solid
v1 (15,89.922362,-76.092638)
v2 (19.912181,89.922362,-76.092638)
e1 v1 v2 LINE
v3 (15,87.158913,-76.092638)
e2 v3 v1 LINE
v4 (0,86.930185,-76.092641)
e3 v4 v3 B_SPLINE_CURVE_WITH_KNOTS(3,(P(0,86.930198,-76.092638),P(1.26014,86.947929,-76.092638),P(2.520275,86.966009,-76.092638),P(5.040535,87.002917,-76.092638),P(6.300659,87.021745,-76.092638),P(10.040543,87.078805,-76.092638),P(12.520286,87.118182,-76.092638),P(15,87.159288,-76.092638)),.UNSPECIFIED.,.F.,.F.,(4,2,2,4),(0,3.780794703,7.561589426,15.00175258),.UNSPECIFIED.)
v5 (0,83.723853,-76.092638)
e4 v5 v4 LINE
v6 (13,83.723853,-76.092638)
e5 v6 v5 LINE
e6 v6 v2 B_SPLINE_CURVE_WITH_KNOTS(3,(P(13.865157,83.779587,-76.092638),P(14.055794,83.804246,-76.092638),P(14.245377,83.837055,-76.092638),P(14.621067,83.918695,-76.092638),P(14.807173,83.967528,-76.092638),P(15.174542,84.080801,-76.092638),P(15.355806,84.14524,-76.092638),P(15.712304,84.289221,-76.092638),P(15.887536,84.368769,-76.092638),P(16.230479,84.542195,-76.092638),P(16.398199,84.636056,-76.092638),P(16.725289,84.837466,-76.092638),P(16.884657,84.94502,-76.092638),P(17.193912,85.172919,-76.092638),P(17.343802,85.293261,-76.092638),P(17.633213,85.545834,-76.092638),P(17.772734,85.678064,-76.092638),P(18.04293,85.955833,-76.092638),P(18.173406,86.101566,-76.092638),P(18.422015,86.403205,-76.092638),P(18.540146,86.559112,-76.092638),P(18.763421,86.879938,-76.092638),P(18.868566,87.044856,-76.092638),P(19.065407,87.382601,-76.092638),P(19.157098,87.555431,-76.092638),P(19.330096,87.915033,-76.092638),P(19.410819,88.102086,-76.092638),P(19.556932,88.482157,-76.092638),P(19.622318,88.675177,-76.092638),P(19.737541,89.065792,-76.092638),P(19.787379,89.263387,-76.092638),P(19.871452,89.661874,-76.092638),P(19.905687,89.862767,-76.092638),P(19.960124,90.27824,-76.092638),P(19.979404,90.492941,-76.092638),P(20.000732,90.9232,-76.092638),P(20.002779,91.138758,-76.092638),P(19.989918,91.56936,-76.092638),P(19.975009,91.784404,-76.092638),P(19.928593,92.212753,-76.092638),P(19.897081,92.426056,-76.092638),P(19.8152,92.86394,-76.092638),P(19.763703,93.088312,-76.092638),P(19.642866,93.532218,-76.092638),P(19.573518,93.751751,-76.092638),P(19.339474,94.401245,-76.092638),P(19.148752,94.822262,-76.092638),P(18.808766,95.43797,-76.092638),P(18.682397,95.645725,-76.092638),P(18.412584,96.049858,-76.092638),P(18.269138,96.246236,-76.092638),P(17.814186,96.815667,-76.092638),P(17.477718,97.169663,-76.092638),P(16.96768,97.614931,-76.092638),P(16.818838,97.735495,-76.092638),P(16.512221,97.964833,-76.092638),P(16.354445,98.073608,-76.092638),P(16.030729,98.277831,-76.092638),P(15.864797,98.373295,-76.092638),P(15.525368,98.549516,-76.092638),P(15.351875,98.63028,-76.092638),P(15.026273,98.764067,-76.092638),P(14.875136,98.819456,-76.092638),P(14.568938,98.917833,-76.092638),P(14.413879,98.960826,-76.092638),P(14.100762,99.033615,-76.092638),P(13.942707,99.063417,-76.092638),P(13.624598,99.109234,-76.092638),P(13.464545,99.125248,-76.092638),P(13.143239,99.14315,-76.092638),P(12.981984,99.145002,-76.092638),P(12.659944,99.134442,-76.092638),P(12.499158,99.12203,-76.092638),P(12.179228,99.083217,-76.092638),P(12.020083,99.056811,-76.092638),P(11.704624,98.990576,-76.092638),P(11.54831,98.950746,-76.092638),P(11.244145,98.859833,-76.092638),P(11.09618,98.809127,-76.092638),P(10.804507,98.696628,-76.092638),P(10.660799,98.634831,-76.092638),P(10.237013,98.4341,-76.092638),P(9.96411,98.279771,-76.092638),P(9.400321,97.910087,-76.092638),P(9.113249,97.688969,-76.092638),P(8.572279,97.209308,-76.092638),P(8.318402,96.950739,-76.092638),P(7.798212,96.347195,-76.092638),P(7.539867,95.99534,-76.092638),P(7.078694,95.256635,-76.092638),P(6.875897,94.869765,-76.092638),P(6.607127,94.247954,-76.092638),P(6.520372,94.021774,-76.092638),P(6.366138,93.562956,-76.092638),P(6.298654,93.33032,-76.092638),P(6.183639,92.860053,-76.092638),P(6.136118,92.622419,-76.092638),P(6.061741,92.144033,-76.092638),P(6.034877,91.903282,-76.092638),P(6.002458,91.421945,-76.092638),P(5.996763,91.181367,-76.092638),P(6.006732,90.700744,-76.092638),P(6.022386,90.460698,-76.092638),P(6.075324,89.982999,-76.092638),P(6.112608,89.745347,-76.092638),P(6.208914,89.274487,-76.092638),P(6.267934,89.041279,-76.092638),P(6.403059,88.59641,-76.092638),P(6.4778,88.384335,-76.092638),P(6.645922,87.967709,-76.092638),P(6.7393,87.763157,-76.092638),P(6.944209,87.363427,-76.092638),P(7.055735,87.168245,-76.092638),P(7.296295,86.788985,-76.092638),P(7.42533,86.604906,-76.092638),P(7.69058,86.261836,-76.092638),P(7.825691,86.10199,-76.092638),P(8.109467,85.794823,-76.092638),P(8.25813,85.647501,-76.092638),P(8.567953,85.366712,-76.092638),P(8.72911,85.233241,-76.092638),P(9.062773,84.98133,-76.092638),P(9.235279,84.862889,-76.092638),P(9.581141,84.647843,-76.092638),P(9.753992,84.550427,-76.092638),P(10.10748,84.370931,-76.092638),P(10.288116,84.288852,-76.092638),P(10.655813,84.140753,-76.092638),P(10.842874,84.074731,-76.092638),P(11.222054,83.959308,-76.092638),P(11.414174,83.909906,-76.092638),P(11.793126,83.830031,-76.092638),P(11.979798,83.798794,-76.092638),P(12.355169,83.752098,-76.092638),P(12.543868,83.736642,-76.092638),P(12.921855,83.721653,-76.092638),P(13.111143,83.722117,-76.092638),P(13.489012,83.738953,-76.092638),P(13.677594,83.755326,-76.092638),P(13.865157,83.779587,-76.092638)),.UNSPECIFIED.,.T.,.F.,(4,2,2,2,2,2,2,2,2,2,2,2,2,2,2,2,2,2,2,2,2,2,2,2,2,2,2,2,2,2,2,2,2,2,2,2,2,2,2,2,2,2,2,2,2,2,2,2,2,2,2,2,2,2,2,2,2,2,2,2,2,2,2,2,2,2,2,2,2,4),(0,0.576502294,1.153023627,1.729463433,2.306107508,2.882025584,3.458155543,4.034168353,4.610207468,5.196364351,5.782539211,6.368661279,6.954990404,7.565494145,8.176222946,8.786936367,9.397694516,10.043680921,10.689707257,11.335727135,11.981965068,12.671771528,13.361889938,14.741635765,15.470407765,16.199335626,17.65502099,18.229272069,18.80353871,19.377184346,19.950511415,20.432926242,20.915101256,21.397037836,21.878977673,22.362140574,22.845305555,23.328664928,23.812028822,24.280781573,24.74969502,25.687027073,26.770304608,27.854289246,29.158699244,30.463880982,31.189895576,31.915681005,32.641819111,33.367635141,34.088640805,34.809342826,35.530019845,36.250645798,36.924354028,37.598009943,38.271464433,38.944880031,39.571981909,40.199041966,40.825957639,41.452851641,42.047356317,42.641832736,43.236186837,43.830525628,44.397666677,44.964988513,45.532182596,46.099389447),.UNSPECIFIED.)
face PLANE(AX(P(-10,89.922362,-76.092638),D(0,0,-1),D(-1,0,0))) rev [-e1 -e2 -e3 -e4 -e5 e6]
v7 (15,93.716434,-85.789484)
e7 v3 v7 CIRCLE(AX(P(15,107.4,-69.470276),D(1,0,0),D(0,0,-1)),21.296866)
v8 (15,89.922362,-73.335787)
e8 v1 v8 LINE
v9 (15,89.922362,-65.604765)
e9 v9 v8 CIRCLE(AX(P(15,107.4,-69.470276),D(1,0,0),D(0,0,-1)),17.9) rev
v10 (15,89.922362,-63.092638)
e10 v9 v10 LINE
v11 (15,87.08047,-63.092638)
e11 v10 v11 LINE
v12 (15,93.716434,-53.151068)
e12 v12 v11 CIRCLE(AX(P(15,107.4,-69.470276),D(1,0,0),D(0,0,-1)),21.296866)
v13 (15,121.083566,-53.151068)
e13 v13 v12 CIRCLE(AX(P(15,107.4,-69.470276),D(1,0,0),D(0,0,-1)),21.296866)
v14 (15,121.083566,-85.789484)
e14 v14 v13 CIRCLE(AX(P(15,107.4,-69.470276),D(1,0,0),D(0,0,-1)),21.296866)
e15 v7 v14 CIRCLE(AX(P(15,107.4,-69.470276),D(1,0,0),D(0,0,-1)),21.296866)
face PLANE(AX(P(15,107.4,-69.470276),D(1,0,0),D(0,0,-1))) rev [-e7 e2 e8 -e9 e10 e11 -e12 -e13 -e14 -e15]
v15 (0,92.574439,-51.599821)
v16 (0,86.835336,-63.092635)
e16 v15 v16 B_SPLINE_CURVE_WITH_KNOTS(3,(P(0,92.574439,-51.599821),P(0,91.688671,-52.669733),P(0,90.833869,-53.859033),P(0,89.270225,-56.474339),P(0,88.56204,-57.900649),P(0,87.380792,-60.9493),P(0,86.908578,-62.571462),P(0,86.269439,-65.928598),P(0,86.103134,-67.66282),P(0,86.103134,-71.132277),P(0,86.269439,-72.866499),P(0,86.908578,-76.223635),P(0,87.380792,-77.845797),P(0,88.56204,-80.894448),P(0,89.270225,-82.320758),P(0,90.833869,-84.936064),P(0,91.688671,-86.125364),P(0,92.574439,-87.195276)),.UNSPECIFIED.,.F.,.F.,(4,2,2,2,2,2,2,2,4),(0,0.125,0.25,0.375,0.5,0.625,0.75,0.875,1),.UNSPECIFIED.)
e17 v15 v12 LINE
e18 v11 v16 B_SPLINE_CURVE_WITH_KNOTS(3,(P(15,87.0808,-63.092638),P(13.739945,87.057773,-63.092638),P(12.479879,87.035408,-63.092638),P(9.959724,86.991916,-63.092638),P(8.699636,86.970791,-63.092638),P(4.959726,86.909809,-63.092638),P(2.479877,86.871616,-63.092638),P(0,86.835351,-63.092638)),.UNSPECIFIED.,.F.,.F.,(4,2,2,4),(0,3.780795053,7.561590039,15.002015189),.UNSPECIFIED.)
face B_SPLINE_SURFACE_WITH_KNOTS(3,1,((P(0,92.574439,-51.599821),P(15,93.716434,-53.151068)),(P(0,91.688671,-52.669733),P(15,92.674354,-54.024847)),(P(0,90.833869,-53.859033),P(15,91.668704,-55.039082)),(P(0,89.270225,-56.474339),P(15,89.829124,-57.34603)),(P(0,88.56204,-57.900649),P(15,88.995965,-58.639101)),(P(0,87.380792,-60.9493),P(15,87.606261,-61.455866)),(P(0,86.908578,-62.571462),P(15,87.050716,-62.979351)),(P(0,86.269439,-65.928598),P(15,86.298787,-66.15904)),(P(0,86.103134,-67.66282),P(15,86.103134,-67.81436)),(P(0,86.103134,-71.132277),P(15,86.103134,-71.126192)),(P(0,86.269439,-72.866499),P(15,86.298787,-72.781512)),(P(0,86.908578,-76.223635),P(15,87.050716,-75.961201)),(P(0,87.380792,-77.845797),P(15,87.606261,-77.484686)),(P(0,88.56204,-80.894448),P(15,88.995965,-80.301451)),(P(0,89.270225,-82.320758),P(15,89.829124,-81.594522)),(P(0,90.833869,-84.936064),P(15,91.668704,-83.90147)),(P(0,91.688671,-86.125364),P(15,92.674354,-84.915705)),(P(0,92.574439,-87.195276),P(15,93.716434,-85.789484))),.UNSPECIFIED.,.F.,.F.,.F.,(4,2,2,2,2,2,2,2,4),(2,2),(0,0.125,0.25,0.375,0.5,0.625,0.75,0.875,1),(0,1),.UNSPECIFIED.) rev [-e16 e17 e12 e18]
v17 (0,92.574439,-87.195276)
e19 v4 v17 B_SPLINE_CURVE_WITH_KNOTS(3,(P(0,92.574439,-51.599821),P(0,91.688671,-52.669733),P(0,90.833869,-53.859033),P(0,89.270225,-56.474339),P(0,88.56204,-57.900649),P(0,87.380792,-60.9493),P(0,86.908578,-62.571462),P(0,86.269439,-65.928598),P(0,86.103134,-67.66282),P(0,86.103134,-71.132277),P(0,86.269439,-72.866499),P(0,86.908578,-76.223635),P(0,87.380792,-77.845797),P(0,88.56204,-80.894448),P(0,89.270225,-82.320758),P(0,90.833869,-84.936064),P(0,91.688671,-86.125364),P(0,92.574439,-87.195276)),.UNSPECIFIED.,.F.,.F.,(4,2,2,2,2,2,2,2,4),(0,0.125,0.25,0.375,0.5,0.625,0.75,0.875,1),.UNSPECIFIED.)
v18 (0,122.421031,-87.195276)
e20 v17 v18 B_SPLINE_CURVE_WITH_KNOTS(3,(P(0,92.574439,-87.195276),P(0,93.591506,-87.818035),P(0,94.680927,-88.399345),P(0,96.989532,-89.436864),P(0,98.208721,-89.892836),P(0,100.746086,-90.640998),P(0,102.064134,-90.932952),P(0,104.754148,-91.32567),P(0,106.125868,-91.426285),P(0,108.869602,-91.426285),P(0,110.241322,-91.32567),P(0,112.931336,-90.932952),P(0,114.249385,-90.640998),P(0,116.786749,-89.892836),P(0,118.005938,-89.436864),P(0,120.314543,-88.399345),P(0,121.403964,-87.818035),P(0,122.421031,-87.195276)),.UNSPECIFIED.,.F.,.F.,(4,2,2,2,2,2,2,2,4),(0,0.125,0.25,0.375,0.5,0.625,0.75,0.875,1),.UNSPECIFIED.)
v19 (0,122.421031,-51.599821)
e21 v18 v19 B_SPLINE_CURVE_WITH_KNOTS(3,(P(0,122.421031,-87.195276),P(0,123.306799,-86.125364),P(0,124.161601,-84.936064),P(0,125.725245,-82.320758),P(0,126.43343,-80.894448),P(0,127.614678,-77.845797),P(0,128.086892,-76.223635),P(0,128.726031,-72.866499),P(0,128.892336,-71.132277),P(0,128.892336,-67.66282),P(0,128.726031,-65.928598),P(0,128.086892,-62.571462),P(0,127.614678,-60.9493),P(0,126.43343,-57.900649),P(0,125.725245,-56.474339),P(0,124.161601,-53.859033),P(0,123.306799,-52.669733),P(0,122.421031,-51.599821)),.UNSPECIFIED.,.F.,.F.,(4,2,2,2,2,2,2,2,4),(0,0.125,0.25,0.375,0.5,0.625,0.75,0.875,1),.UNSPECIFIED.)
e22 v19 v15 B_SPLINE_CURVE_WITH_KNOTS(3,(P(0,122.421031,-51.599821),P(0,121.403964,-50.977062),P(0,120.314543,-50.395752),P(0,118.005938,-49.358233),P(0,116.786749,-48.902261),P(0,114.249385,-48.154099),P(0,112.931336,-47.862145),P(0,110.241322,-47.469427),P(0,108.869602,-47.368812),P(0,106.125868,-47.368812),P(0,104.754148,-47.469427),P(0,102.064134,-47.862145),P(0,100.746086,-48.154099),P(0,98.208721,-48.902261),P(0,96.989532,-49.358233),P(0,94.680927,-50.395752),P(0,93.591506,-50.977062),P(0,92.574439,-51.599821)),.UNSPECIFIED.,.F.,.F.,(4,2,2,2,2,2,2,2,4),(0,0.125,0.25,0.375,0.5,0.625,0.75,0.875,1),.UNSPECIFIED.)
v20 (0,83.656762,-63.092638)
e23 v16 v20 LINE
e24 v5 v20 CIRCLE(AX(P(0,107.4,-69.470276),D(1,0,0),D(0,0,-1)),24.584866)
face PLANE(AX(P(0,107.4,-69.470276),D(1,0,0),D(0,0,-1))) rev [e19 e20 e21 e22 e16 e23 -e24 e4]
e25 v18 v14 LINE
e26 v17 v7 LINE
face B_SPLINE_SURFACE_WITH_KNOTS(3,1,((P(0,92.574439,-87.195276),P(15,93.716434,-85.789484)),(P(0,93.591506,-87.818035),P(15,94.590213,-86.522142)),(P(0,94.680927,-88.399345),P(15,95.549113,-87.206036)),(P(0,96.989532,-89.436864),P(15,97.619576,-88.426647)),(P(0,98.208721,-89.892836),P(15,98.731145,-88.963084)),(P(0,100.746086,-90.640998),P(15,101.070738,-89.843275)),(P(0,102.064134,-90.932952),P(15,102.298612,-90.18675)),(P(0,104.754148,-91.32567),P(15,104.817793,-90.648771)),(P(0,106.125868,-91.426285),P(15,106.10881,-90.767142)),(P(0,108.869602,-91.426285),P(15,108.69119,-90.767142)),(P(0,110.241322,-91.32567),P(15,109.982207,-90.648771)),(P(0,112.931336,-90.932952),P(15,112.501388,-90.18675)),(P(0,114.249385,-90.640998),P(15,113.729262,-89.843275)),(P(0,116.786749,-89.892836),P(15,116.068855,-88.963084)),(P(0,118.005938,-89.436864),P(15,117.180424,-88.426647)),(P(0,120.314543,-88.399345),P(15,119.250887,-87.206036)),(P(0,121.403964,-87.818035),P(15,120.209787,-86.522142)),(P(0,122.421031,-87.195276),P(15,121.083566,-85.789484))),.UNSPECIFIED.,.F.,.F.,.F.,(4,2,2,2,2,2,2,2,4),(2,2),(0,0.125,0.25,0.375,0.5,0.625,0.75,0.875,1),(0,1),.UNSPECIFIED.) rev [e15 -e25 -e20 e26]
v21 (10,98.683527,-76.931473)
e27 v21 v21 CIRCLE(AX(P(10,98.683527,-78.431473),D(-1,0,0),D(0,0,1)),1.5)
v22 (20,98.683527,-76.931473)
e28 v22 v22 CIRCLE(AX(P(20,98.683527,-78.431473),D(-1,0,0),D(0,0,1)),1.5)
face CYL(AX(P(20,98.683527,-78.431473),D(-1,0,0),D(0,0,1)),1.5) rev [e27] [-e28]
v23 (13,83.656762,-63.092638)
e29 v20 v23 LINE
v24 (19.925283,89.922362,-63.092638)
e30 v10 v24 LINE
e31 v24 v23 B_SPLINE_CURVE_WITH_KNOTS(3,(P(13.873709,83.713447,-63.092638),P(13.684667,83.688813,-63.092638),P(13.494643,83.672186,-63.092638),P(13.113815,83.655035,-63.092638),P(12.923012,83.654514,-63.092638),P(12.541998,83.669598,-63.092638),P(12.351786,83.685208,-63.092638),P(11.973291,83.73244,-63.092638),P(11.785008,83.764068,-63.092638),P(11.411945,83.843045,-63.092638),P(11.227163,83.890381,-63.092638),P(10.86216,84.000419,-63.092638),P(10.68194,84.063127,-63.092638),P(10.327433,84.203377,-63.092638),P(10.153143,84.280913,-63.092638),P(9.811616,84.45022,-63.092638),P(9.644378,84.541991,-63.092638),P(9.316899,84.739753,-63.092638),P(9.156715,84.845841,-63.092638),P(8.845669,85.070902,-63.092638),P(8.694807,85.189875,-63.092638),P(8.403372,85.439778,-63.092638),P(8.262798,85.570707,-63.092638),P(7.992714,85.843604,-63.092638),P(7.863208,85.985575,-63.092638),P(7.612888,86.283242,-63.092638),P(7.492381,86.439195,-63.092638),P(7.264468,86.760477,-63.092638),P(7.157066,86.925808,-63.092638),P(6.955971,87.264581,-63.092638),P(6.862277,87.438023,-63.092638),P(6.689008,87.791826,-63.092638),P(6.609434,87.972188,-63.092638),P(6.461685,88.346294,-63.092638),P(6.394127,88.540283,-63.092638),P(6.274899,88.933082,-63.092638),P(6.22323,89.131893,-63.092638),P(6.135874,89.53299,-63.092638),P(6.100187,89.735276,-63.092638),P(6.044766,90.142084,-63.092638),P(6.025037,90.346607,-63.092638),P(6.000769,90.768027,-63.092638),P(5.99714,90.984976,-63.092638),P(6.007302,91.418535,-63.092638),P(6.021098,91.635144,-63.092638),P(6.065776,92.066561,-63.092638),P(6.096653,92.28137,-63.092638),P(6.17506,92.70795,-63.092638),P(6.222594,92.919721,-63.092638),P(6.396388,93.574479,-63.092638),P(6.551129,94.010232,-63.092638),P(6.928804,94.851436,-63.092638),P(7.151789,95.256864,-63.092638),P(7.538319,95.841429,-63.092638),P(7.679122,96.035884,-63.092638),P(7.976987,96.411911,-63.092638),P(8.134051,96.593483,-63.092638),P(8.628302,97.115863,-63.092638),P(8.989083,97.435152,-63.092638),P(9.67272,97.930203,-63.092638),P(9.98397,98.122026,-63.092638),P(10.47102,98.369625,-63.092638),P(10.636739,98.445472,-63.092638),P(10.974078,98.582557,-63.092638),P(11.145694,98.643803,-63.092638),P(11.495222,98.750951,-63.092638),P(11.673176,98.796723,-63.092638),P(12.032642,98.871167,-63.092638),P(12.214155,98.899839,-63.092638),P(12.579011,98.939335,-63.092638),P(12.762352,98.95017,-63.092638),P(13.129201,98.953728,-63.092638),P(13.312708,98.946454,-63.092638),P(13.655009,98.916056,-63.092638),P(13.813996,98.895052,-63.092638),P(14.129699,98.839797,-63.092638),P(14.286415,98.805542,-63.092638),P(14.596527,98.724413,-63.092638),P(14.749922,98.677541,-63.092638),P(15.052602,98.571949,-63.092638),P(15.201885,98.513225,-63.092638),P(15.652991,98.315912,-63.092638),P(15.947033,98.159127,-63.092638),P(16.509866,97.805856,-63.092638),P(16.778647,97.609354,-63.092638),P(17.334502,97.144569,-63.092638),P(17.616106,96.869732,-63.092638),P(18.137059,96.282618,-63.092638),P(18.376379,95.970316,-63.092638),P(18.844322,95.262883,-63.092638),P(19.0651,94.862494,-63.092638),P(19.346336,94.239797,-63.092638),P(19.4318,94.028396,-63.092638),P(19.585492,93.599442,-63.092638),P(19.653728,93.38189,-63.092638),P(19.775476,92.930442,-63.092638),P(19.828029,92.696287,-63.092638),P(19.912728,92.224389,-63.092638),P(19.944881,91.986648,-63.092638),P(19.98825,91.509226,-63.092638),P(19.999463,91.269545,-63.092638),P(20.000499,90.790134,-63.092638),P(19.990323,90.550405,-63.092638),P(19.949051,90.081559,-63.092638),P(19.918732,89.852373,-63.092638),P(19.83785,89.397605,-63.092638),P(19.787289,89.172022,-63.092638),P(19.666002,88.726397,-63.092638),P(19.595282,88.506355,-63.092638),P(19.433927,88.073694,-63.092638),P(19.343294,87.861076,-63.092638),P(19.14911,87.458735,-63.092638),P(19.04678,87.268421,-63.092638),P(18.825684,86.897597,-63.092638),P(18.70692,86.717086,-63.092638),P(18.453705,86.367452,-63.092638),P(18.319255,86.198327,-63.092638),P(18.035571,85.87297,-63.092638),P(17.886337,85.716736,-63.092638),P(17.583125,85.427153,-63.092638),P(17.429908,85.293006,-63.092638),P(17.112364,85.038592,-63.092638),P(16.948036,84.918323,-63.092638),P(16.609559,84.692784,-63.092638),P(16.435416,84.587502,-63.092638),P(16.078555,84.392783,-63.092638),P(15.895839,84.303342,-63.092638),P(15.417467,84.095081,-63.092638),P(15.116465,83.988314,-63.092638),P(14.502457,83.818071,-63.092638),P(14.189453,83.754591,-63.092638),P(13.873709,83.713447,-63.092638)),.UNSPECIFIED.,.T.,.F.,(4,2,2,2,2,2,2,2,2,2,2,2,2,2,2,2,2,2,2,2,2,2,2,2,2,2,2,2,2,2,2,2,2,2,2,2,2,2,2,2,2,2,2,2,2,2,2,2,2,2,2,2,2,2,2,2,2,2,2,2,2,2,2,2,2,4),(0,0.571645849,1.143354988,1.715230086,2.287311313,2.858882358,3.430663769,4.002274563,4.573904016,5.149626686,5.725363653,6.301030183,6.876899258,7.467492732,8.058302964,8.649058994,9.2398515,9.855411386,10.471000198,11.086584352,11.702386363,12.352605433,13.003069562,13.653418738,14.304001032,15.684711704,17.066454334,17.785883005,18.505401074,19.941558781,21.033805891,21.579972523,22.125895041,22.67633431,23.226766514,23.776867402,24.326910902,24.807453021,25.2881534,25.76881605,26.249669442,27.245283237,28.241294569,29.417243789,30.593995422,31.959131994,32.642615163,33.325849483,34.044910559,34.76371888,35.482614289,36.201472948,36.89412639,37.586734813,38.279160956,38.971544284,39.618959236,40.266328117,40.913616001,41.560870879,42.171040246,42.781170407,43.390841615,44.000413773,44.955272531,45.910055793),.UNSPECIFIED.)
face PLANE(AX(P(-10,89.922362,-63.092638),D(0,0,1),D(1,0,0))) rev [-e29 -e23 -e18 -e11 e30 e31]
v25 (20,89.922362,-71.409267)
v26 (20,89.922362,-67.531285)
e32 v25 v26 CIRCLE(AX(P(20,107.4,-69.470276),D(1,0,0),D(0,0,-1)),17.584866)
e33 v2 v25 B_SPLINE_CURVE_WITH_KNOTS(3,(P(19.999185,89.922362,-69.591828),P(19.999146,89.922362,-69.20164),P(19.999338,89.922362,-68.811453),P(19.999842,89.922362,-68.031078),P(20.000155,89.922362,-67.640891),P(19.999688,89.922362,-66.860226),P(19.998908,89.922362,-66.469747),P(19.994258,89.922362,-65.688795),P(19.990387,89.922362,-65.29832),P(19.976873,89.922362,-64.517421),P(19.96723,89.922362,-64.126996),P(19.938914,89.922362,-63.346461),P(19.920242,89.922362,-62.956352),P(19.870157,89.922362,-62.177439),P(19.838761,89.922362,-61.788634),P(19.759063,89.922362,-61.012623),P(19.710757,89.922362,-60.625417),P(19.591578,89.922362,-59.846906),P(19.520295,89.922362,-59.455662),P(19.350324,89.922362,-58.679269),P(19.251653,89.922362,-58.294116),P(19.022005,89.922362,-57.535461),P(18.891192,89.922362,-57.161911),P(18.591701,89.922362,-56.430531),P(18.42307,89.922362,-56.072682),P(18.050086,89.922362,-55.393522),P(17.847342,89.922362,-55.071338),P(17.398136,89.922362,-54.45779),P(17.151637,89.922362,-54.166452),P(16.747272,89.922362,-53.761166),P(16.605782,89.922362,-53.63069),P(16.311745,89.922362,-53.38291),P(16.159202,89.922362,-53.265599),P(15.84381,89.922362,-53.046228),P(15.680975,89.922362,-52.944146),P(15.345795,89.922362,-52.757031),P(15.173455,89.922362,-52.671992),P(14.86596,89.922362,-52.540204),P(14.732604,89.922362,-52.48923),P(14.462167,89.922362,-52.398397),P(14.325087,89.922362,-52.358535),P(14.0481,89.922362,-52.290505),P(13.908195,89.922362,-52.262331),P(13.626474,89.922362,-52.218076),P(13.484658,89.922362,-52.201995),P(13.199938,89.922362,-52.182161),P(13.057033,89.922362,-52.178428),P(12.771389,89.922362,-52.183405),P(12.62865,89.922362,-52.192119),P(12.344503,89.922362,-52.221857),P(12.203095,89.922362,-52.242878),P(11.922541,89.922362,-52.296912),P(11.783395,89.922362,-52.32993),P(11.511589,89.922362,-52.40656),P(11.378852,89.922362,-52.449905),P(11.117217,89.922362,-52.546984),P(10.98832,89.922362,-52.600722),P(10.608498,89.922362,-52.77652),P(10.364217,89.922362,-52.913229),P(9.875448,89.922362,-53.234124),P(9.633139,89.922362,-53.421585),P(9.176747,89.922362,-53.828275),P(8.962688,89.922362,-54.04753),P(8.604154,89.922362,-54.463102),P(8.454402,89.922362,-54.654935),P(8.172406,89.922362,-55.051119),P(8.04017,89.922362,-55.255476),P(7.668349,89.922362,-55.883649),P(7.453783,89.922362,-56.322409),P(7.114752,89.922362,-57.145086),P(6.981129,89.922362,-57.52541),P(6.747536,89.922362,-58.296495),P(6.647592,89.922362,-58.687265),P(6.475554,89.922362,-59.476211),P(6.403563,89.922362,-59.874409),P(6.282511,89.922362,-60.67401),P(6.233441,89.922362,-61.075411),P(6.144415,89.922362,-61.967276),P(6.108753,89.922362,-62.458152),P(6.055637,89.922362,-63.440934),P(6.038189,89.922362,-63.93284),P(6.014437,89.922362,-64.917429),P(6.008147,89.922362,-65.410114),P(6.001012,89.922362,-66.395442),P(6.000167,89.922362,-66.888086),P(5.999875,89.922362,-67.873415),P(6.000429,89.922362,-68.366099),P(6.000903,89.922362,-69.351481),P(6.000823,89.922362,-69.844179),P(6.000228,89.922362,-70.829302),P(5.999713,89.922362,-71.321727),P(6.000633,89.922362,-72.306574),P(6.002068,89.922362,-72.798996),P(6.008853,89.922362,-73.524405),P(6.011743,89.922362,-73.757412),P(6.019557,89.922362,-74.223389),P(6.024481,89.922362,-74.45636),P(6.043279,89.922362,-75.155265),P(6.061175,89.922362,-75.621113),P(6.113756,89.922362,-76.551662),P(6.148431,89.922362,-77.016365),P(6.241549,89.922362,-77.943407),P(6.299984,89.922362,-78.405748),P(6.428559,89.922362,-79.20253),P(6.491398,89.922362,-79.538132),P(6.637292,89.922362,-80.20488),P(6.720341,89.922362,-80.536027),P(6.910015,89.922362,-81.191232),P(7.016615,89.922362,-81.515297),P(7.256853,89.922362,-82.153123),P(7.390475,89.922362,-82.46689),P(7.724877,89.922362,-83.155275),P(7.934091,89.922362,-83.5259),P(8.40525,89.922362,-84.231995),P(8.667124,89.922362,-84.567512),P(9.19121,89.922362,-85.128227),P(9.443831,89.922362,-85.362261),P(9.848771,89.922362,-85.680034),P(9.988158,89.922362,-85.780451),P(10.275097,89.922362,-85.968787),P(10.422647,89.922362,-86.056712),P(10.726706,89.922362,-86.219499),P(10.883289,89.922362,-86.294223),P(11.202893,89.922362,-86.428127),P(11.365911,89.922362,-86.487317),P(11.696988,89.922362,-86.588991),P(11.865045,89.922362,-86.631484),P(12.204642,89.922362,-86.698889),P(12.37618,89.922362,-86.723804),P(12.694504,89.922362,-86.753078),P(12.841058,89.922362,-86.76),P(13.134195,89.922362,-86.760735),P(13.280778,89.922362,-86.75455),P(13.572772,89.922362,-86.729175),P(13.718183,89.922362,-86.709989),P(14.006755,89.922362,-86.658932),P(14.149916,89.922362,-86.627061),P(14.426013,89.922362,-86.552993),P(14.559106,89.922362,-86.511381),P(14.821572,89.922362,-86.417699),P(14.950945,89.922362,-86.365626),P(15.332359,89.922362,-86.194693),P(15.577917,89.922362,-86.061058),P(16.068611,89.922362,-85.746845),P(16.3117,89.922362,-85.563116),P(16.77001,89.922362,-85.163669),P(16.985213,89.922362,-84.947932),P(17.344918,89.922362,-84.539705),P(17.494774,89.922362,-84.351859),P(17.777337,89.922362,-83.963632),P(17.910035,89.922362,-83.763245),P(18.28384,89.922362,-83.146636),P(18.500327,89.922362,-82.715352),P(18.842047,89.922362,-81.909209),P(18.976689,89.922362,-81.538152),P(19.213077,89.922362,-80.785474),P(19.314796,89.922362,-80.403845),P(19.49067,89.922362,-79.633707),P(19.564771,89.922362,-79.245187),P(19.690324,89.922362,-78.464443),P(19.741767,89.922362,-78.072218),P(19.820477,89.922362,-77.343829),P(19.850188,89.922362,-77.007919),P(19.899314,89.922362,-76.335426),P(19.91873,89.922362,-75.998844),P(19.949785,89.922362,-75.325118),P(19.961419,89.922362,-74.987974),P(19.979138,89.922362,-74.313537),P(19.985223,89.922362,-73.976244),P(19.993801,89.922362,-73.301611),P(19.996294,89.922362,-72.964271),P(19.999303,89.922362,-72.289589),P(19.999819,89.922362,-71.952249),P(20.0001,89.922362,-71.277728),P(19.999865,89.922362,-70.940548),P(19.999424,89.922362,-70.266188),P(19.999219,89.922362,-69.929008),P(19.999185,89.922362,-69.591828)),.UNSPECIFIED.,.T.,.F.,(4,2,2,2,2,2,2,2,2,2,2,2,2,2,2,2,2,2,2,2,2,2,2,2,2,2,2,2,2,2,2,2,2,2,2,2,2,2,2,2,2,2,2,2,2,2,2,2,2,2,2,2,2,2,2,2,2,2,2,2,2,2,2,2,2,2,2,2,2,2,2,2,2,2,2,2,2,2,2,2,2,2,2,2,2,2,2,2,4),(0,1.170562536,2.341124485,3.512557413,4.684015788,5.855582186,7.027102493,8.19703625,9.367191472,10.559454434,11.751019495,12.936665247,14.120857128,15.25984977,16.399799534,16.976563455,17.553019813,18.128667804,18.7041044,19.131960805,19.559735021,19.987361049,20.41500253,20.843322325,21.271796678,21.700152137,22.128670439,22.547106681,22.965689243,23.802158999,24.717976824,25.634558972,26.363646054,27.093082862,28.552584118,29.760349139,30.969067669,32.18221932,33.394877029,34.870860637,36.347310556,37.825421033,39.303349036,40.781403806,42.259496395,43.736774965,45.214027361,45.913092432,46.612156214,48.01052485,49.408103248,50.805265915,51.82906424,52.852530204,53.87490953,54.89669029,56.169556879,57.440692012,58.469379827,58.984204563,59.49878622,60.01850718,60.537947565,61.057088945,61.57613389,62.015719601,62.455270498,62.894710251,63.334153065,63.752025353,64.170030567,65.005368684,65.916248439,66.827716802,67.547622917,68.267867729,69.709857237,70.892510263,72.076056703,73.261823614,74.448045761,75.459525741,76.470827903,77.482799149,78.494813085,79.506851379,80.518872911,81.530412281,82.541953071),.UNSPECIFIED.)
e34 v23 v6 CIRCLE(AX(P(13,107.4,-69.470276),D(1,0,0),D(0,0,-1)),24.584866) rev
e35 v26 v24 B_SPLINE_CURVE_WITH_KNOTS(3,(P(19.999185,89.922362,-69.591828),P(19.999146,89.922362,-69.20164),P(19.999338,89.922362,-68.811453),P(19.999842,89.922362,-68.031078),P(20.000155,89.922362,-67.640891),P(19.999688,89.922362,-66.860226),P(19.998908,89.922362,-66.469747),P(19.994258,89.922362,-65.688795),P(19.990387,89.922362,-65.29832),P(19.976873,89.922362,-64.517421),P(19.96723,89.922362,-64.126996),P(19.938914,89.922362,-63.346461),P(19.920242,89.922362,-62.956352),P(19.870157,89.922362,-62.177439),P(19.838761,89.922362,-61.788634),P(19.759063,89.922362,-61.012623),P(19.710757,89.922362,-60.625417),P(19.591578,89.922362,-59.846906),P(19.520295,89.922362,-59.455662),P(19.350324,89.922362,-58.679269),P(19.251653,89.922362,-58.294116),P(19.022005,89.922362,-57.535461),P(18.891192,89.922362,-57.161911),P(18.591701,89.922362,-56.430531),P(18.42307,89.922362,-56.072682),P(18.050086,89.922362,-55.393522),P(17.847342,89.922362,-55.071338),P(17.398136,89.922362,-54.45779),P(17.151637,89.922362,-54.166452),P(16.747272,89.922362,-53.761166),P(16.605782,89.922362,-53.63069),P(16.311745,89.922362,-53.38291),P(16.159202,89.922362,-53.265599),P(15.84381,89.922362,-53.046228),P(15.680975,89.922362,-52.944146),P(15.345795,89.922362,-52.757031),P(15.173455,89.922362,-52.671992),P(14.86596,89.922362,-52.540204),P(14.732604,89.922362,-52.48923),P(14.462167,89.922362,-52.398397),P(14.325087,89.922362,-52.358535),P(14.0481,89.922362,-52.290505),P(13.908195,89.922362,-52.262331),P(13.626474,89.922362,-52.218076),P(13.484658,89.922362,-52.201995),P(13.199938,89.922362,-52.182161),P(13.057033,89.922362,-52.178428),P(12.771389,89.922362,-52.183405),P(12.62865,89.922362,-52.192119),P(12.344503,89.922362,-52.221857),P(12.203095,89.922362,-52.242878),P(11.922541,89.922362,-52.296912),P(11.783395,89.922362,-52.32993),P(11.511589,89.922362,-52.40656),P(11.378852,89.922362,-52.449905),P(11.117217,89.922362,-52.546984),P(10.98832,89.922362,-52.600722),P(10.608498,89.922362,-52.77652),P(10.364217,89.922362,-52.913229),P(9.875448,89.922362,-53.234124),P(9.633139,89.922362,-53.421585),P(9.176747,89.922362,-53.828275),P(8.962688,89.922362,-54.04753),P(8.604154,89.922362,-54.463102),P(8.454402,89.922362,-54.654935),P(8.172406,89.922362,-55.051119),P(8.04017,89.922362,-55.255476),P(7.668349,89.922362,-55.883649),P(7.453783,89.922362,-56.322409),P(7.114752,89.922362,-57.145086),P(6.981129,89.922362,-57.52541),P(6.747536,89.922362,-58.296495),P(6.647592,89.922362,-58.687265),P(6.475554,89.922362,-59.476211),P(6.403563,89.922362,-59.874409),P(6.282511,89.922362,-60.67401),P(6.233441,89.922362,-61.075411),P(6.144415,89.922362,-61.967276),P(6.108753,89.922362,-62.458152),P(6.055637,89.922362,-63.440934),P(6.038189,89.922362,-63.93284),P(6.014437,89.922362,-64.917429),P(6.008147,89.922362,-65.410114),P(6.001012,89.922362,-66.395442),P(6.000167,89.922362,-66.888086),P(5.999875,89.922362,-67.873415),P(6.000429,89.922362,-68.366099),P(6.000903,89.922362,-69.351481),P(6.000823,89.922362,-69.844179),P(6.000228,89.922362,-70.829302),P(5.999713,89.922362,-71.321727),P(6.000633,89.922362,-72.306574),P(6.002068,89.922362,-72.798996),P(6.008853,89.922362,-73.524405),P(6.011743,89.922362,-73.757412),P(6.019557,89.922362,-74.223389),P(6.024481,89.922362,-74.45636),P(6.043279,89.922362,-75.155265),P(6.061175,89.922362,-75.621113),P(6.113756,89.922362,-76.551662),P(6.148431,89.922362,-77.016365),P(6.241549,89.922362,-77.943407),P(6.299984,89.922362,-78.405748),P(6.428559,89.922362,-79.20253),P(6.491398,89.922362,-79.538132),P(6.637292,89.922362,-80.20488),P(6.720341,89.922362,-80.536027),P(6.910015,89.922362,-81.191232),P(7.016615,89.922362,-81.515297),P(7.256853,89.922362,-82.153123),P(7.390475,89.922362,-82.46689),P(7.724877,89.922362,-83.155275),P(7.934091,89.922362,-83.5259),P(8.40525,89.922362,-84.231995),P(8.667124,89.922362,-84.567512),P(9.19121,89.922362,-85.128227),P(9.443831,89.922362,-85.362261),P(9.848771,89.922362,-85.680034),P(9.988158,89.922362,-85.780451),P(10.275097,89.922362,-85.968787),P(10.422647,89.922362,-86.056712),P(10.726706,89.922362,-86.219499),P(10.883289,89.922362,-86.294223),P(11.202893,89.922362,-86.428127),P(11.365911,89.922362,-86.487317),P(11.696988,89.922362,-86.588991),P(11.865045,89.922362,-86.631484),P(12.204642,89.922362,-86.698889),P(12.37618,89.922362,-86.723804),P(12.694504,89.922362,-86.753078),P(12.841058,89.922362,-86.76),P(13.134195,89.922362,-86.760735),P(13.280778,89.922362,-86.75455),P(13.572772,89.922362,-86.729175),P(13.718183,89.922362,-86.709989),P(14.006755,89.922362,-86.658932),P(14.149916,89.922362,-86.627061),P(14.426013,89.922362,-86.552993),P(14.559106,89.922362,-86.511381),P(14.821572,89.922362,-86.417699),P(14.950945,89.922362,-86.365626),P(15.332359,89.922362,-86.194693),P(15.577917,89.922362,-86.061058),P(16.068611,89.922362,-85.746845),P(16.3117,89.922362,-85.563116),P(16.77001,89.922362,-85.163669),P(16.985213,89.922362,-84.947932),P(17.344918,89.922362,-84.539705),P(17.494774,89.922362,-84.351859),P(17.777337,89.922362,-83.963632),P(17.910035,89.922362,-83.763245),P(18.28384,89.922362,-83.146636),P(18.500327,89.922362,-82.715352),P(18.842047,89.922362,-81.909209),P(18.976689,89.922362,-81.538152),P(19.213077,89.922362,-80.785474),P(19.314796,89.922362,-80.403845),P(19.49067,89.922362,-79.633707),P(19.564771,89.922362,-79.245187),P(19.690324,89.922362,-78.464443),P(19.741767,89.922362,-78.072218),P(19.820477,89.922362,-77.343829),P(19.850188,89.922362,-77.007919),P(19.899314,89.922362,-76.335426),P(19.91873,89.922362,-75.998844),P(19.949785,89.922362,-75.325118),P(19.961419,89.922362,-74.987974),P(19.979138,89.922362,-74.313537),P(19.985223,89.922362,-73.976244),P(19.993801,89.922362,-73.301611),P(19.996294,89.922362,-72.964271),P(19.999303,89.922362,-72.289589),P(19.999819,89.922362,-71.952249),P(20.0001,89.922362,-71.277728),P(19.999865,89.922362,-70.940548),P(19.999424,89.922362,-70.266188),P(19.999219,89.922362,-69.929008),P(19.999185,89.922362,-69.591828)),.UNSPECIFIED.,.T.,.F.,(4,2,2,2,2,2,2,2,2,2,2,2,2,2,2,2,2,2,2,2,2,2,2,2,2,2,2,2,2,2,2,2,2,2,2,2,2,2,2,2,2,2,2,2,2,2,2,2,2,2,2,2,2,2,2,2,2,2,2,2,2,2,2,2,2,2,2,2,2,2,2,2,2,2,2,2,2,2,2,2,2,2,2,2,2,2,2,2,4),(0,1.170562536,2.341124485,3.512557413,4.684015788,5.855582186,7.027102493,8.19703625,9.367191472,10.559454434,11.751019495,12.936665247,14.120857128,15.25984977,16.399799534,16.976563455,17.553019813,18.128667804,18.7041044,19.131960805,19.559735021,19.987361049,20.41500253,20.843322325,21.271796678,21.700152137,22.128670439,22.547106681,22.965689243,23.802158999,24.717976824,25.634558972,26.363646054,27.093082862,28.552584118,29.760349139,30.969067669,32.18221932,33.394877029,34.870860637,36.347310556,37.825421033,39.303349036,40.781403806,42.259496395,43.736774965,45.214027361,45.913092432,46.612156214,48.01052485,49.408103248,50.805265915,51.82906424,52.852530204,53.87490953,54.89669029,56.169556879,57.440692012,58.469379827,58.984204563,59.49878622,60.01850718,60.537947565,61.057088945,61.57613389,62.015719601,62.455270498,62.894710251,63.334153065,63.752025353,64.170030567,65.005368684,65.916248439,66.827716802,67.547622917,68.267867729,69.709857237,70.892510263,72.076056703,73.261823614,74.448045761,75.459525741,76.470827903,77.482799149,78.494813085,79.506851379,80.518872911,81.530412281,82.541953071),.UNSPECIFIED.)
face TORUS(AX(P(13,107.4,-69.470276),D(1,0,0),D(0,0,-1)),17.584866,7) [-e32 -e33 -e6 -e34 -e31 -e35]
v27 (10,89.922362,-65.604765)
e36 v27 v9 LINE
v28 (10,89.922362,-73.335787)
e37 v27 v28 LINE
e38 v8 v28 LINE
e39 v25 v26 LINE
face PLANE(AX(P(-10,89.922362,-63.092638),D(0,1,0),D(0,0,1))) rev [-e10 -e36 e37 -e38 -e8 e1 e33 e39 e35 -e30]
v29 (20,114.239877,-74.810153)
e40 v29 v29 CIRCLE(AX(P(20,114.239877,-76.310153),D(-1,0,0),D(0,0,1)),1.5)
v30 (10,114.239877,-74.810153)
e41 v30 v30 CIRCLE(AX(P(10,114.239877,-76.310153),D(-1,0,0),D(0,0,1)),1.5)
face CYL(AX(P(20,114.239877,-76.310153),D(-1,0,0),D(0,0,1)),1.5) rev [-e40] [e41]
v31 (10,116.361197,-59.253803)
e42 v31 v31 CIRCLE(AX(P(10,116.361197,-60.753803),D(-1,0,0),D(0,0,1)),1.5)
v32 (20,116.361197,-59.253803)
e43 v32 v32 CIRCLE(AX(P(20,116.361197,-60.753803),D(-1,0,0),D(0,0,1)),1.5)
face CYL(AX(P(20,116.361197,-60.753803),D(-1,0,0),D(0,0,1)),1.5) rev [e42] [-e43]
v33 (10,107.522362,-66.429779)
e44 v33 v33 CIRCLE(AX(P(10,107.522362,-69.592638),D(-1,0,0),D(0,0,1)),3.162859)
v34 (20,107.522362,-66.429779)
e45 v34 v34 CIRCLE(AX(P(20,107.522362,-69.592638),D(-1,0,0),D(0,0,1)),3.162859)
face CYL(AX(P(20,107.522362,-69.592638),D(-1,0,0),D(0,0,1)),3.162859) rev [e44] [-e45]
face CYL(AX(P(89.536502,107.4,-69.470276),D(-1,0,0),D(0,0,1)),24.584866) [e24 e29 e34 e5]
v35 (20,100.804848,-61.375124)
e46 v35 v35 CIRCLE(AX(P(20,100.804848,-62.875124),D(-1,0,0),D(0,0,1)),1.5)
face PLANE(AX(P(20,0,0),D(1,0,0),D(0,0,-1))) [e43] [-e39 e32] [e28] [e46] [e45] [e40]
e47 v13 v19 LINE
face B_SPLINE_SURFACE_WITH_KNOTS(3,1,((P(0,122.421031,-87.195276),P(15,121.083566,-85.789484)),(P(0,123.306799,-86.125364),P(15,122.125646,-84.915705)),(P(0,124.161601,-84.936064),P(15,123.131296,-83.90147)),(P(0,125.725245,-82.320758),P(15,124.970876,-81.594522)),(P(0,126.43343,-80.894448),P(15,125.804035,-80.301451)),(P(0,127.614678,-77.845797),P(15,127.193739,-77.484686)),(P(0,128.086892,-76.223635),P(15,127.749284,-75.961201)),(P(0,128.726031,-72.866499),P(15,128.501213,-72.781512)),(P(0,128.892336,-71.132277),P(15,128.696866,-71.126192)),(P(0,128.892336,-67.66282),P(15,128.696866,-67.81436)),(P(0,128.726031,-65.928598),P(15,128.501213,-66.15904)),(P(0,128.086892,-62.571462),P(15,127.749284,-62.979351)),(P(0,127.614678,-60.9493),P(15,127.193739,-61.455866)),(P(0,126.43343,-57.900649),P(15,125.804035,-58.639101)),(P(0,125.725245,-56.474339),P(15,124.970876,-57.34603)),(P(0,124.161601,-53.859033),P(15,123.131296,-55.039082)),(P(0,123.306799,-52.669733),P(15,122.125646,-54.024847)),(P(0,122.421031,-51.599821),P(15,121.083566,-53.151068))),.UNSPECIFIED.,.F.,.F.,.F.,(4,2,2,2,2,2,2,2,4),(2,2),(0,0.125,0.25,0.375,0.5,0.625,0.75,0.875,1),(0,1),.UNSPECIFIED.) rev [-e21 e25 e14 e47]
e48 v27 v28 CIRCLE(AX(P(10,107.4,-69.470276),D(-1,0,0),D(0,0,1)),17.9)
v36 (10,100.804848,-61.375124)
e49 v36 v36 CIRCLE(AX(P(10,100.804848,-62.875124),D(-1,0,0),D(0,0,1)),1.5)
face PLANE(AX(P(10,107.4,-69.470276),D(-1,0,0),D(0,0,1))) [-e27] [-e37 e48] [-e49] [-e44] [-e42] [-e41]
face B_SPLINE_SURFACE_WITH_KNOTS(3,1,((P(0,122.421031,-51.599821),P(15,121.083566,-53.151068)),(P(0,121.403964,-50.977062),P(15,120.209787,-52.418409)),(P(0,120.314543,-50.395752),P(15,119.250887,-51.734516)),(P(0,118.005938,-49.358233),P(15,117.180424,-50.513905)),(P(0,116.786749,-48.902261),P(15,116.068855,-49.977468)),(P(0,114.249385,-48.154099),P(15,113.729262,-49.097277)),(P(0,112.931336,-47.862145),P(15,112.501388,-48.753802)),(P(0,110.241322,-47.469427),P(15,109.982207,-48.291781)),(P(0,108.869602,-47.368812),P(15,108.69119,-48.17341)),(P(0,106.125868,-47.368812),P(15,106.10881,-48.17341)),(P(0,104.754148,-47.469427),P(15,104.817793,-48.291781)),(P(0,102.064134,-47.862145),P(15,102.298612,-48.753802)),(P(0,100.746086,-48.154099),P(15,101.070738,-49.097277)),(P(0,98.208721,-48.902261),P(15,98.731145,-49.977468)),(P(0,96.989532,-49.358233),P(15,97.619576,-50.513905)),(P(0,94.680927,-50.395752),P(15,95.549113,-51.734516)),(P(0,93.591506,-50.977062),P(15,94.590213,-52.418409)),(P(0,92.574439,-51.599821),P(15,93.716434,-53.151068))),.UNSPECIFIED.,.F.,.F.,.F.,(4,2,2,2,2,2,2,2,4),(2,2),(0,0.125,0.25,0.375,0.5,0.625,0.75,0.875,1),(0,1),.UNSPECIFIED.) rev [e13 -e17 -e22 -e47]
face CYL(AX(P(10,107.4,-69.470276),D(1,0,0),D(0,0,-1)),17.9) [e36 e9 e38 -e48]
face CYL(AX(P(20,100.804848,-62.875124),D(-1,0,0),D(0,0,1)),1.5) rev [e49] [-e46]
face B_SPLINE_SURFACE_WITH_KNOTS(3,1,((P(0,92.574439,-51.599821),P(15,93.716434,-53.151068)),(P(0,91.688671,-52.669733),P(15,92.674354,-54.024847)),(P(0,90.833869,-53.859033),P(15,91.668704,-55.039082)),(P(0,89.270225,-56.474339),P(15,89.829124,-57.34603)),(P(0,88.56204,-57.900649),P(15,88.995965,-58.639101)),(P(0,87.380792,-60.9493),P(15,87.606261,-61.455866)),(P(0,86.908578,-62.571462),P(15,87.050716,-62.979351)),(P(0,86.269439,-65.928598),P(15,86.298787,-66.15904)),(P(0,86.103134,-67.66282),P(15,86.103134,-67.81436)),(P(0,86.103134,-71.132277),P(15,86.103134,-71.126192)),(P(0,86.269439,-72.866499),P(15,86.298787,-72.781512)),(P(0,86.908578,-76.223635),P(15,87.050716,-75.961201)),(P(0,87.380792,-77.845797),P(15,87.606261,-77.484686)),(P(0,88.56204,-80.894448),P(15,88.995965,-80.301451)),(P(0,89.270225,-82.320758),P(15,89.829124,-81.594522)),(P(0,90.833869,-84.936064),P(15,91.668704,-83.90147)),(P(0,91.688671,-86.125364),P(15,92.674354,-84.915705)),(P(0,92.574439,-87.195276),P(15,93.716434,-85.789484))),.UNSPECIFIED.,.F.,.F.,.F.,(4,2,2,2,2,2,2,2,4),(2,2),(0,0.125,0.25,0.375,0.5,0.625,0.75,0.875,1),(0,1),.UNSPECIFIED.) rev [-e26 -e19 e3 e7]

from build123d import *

# Parameters (mm, degrees)
SKETCH1_R           = 24.584865892
BOSS_EXTRUDE4_DEPTH = 20
SKETCH5_R           = 17.9
BOSS_EXTRUDE5_DEPTH = 5
SKETCH6_R           = 1.5
SKETCH6_R_2         = 3.162859367
CUT_EXTRUDE1_DEPTH  = 10
FILLET1_R           = 7
SKETCH8_W           = 13
SKETCH8_H           = 8.974684843
CUT_EXTRUDE2_DEPTH  = 30


with BuildPart() as part:
    # Sketch1 → Boss-Extrude4 (new body)
    with BuildSketch(Plane(origin=(0, 0, 0), x_dir=(0, 0, -1), z_dir=(1, 0, 0))):
        with Locations((69.470275966, 107.4)):
            Circle(SKETCH1_R)
    extrude(amount=BOSS_EXTRUDE4_DEPTH)

    # Cut-Loft1: read off the stored shape, not the designer's step
    # Cut-Loft1: loft between two sections, ruled curve by curve
    cut_loft1_from = [
        Edge.make_bspline([(0, 122.421030793, -51.5998214), (0, 121.403963567, -50.977061653), (0, 120.31454314, -50.395752434), (0, 118.005938422, -49.358232659), (0, 116.786749472, -48.902260973), (0, 114.249384519, -48.15409937), (0, 112.931336418, -47.862145319), (0, 110.241321726, -47.469427252), (0, 108.869602219, -47.368811755), (0, 106.125867826, -47.368811755), (0, 104.754148319, -47.469427252), (0, 102.064133627, -47.862145319), (0, 100.746085526, -48.15409937), (0, 98.208720572, -48.902260973), (0, 96.989531623, -49.358232659), (0, 94.680926905, -50.395752434), (0, 93.591506478, -50.977061653), (0, 92.574439252, -51.5998214)], [0, 0, 0, 0, 0.125, 0.125, 0.25, 0.25, 0.375, 0.375, 0.5, 0.5, 0.625, 0.625, 0.75, 0.75, 0.875, 0.875, 1, 1, 1, 1], 3),
        Edge.make_bspline([(0, 92.574439252, -51.5998214), (0, 91.688670965, -52.66973324), (0, 90.833868812, -53.859032932), (0, 89.270225328, -56.474339023), (0, 88.562039976, -57.900649218), (0, 87.380791607, -60.949300184), (0, 86.90857847, -62.571462387), (0, 86.269439046, -65.928597857), (0, 86.103133633, -67.662819685), (0, 86.103133633, -71.132277338), (0, 86.269439046, -72.866499165), (0, 86.90857847, -76.223634636), (0, 87.380791607, -77.845796839), (0, 88.562039976, -80.894447804), (0, 89.270225328, -82.320757999), (0, 90.833868812, -84.93606409), (0, 91.688670965, -86.125363783), (0, 92.574439252, -87.195275623)], [0, 0, 0, 0, 0.125, 0.125, 0.25, 0.25, 0.375, 0.375, 0.5, 0.5, 0.625, 0.625, 0.75, 0.75, 0.875, 0.875, 1, 1, 1, 1], 3),
        Edge.make_bspline([(0, 122.421030793, -87.195275623), (0, 123.30679908, -86.125363783), (0, 124.161601233, -84.93606409), (0, 125.725244717, -82.320757999), (0, 126.433430069, -80.894447804), (0, 127.614678438, -77.845796839), (0, 128.086891575, -76.223634636), (0, 128.726030999, -72.866499165), (0, 128.892336412, -71.132277338), (0, 128.892336412, -67.662819685), (0, 128.726030999, -65.928597857), (0, 128.086891575, -62.571462387), (0, 127.614678438, -60.949300184), (0, 126.433430069, -57.900649218), (0, 125.725244717, -56.474339023), (0, 124.161601233, -53.859032932), (0, 123.30679908, -52.66973324), (0, 122.421030793, -51.5998214)], [0, 0, 0, 0, 0.125, 0.125, 0.25, 0.25, 0.375, 0.375, 0.5, 0.5, 0.625, 0.625, 0.75, 0.75, 0.875, 0.875, 1, 1, 1, 1], 3),
        Edge.make_bspline([(0, 92.574439252, -87.195275623), (0, 93.591506478, -87.818035369), (0, 94.680926905, -88.399344588), (0, 96.989531623, -89.436864364), (0, 98.208720572, -89.89283605), (0, 100.746085526, -90.640997653), (0, 102.064133627, -90.932951704), (0, 104.754148319, -91.325669771), (0, 106.125867826, -91.426285268), (0, 108.869602219, -91.426285268), (0, 110.241321726, -91.325669771), (0, 112.931336418, -90.932951704), (0, 114.249384519, -90.640997653), (0, 116.786749472, -89.89283605), (0, 118.005938422, -89.436864364), (0, 120.31454314, -88.399344588), (0, 121.403963567, -87.818035369), (0, 122.421030793, -87.195275623)], [0, 0, 0, 0, 0.125, 0.125, 0.25, 0.25, 0.375, 0.375, 0.5, 0.5, 0.625, 0.625, 0.75, 0.75, 0.875, 0.875, 1, 1, 1, 1], 3),
    ]
    cut_loft1_to = [
        Edge.make_bspline([(15, 121.083565639, -53.151068005), (15, 120.209787037, -52.418409479), (15, 119.250887023, -51.73451628), (15, 117.180423625, -50.51390478), (15, 116.06885476, -49.977467502), (15, 113.729261674, -49.097277381), (15, 112.501387925, -48.753802027), (15, 109.982206911, -48.291780772), (15, 108.691190331, -48.173409599), (15, 106.108809669, -48.173409599), (15, 104.817793089, -48.291780772), (15, 102.298612075, -48.753802027), (15, 101.070738326, -49.097277381), (15, 98.73114524, -49.977467502), (15, 97.619576375, -50.51390478), (15, 95.549112977, -51.73451628), (15, 94.590212963, -52.418409479), (15, 93.716434361, -53.151068005)], [0, 0, 0, 0, 0.125, 0.125, 0.25, 0.25, 0.375, 0.375, 0.5, 0.5, 0.625, 0.625, 0.75, 0.75, 0.875, 0.875, 1, 1, 1, 1], 3),
        Edge.make_bspline([(15, 93.716434361, -53.151068005), (15, 92.674354023, -54.024846606), (15, 91.668704432, -55.039081505), (15, 89.829123863, -57.346029779), (15, 88.995964625, -58.639100564), (15, 87.606260661, -61.455866338), (15, 87.050715794, -62.979351249), (15, 86.29878706, -66.15903997), (15, 86.103133633, -67.814359733), (15, 86.103133633, -71.126192199), (15, 86.29878706, -72.781511962), (15, 87.050715794, -75.961200683), (15, 87.606260661, -77.484685594), (15, 88.995964625, -80.301451369), (15, 89.829123863, -81.594522153), (15, 91.668704432, -83.901470427), (15, 92.674354023, -84.915705326), (15, 93.716434361, -85.789483927)], [0, 0, 0, 0, 0.125, 0.125, 0.25, 0.25, 0.375, 0.375, 0.5, 0.5, 0.625, 0.625, 0.75, 0.75, 0.875, 0.875, 1, 1, 1, 1], 3),
        Edge.make_bspline([(15, 121.083565639, -85.789483927), (15, 122.125645977, -84.915705326), (15, 123.131295568, -83.901470427), (15, 124.970876137, -81.594522153), (15, 125.804035375, -80.301451369), (15, 127.193739339, -77.484685594), (15, 127.749284206, -75.961200683), (15, 128.50121294, -72.781511962), (15, 128.696866367, -71.126192199), (15, 128.696866367, -67.814359733), (15, 128.50121294, -66.15903997), (15, 127.749284206, -62.979351249), (15, 127.193739339, -61.455866338), (15, 125.804035375, -58.639100564), (15, 124.970876137, -57.346029779), (15, 123.131295568, -55.039081505), (15, 122.125645977, -54.024846606), (15, 121.083565639, -53.151068005)], [0, 0, 0, 0, 0.125, 0.125, 0.25, 0.25, 0.375, 0.375, 0.5, 0.5, 0.625, 0.625, 0.75, 0.75, 0.875, 0.875, 1, 1, 1, 1], 3),
        Edge.make_bspline([(15, 93.716434361, -85.789483927), (15, 94.590212963, -86.522142453), (15, 95.549112977, -87.206035652), (15, 97.619576375, -88.426647153), (15, 98.73114524, -88.96308443), (15, 101.070738326, -89.843274551), (15, 102.298612075, -90.186749905), (15, 104.817793089, -90.64877116), (15, 106.108809669, -90.767142333), (15, 108.691190331, -90.767142333), (15, 109.982206911, -90.64877116), (15, 112.501387925, -90.186749905), (15, 113.729261674, -89.843274551), (15, 116.06885476, -88.96308443), (15, 117.180423625, -88.426647153), (15, 119.250887023, -87.206035652), (15, 120.209787037, -86.522142453), (15, 121.083565639, -85.789483927)], [0, 0, 0, 0, 0.125, 0.125, 0.25, 0.25, 0.375, 0.375, 0.5, 0.5, 0.625, 0.625, 0.75, 0.75, 0.875, 0.875, 1, 1, 1, 1], 3),
    ]
    cut_loft1 = Solid(Shell([*[Face.make_surface_from_curves(cut_loft1_from[k], cut_loft1_to[k]) for k in range(4)], Face(Wire(cut_loft1_from)), Face(Wire(cut_loft1_to))]))
    add(cut_loft1, mode=Mode.SUBTRACT)

    # Sketch5 → Boss-Extrude5 (add)
    with BuildSketch(Plane.ZY.offset(-15)):
        with Locations(Location((-69.470275966, 107.4, 0), (0, 0, 180))):
            Circle(SKETCH5_R)
    extrude(amount=BOSS_EXTRUDE5_DEPTH)

    # Sketch6 → Cut-Extrude1 (cut)
    with BuildSketch(Plane.ZY.offset(-10)):
        with Locations((-60.753803406, 116.36119697)):
            Circle(SKETCH6_R)
        with Locations((-78.431472936, 98.68352744)):
            Circle(SKETCH6_R)
        with Locations((-76.310152592, 114.239876626)):
            Circle(SKETCH6_R)
        with Locations((-62.87512375, 100.804847784)):
            Circle(SKETCH6_R)
        with Locations((-69.592638171, 107.522362205)):
            Circle(SKETCH6_R_2)
    extrude(amount=-CUT_EXTRUDE1_DEPTH, mode=Mode.SUBTRACT)

    # Fillet1
    fillet1_edges = [part.edges().sort_by_distance(p)[0] for p in [
        (20, 107.4, -44.885410074),
    ]]
    fillet(fillet1_edges, radius=FILLET1_R)

    # Sketch8 → Cut-Extrude2 (cut)
    with BuildSketch(Plane(origin=(20, 0, 0), x_dir=(0, 0, -1), z_dir=(1, 0, 0))):
        with Locations((69.592638171, 85.435019783)):
            Rectangle(SKETCH8_W, SKETCH8_H)
    extrude(amount=-CUT_EXTRUDE2_DEPTH, mode=Mode.SUBTRACT)


solid = part.part
